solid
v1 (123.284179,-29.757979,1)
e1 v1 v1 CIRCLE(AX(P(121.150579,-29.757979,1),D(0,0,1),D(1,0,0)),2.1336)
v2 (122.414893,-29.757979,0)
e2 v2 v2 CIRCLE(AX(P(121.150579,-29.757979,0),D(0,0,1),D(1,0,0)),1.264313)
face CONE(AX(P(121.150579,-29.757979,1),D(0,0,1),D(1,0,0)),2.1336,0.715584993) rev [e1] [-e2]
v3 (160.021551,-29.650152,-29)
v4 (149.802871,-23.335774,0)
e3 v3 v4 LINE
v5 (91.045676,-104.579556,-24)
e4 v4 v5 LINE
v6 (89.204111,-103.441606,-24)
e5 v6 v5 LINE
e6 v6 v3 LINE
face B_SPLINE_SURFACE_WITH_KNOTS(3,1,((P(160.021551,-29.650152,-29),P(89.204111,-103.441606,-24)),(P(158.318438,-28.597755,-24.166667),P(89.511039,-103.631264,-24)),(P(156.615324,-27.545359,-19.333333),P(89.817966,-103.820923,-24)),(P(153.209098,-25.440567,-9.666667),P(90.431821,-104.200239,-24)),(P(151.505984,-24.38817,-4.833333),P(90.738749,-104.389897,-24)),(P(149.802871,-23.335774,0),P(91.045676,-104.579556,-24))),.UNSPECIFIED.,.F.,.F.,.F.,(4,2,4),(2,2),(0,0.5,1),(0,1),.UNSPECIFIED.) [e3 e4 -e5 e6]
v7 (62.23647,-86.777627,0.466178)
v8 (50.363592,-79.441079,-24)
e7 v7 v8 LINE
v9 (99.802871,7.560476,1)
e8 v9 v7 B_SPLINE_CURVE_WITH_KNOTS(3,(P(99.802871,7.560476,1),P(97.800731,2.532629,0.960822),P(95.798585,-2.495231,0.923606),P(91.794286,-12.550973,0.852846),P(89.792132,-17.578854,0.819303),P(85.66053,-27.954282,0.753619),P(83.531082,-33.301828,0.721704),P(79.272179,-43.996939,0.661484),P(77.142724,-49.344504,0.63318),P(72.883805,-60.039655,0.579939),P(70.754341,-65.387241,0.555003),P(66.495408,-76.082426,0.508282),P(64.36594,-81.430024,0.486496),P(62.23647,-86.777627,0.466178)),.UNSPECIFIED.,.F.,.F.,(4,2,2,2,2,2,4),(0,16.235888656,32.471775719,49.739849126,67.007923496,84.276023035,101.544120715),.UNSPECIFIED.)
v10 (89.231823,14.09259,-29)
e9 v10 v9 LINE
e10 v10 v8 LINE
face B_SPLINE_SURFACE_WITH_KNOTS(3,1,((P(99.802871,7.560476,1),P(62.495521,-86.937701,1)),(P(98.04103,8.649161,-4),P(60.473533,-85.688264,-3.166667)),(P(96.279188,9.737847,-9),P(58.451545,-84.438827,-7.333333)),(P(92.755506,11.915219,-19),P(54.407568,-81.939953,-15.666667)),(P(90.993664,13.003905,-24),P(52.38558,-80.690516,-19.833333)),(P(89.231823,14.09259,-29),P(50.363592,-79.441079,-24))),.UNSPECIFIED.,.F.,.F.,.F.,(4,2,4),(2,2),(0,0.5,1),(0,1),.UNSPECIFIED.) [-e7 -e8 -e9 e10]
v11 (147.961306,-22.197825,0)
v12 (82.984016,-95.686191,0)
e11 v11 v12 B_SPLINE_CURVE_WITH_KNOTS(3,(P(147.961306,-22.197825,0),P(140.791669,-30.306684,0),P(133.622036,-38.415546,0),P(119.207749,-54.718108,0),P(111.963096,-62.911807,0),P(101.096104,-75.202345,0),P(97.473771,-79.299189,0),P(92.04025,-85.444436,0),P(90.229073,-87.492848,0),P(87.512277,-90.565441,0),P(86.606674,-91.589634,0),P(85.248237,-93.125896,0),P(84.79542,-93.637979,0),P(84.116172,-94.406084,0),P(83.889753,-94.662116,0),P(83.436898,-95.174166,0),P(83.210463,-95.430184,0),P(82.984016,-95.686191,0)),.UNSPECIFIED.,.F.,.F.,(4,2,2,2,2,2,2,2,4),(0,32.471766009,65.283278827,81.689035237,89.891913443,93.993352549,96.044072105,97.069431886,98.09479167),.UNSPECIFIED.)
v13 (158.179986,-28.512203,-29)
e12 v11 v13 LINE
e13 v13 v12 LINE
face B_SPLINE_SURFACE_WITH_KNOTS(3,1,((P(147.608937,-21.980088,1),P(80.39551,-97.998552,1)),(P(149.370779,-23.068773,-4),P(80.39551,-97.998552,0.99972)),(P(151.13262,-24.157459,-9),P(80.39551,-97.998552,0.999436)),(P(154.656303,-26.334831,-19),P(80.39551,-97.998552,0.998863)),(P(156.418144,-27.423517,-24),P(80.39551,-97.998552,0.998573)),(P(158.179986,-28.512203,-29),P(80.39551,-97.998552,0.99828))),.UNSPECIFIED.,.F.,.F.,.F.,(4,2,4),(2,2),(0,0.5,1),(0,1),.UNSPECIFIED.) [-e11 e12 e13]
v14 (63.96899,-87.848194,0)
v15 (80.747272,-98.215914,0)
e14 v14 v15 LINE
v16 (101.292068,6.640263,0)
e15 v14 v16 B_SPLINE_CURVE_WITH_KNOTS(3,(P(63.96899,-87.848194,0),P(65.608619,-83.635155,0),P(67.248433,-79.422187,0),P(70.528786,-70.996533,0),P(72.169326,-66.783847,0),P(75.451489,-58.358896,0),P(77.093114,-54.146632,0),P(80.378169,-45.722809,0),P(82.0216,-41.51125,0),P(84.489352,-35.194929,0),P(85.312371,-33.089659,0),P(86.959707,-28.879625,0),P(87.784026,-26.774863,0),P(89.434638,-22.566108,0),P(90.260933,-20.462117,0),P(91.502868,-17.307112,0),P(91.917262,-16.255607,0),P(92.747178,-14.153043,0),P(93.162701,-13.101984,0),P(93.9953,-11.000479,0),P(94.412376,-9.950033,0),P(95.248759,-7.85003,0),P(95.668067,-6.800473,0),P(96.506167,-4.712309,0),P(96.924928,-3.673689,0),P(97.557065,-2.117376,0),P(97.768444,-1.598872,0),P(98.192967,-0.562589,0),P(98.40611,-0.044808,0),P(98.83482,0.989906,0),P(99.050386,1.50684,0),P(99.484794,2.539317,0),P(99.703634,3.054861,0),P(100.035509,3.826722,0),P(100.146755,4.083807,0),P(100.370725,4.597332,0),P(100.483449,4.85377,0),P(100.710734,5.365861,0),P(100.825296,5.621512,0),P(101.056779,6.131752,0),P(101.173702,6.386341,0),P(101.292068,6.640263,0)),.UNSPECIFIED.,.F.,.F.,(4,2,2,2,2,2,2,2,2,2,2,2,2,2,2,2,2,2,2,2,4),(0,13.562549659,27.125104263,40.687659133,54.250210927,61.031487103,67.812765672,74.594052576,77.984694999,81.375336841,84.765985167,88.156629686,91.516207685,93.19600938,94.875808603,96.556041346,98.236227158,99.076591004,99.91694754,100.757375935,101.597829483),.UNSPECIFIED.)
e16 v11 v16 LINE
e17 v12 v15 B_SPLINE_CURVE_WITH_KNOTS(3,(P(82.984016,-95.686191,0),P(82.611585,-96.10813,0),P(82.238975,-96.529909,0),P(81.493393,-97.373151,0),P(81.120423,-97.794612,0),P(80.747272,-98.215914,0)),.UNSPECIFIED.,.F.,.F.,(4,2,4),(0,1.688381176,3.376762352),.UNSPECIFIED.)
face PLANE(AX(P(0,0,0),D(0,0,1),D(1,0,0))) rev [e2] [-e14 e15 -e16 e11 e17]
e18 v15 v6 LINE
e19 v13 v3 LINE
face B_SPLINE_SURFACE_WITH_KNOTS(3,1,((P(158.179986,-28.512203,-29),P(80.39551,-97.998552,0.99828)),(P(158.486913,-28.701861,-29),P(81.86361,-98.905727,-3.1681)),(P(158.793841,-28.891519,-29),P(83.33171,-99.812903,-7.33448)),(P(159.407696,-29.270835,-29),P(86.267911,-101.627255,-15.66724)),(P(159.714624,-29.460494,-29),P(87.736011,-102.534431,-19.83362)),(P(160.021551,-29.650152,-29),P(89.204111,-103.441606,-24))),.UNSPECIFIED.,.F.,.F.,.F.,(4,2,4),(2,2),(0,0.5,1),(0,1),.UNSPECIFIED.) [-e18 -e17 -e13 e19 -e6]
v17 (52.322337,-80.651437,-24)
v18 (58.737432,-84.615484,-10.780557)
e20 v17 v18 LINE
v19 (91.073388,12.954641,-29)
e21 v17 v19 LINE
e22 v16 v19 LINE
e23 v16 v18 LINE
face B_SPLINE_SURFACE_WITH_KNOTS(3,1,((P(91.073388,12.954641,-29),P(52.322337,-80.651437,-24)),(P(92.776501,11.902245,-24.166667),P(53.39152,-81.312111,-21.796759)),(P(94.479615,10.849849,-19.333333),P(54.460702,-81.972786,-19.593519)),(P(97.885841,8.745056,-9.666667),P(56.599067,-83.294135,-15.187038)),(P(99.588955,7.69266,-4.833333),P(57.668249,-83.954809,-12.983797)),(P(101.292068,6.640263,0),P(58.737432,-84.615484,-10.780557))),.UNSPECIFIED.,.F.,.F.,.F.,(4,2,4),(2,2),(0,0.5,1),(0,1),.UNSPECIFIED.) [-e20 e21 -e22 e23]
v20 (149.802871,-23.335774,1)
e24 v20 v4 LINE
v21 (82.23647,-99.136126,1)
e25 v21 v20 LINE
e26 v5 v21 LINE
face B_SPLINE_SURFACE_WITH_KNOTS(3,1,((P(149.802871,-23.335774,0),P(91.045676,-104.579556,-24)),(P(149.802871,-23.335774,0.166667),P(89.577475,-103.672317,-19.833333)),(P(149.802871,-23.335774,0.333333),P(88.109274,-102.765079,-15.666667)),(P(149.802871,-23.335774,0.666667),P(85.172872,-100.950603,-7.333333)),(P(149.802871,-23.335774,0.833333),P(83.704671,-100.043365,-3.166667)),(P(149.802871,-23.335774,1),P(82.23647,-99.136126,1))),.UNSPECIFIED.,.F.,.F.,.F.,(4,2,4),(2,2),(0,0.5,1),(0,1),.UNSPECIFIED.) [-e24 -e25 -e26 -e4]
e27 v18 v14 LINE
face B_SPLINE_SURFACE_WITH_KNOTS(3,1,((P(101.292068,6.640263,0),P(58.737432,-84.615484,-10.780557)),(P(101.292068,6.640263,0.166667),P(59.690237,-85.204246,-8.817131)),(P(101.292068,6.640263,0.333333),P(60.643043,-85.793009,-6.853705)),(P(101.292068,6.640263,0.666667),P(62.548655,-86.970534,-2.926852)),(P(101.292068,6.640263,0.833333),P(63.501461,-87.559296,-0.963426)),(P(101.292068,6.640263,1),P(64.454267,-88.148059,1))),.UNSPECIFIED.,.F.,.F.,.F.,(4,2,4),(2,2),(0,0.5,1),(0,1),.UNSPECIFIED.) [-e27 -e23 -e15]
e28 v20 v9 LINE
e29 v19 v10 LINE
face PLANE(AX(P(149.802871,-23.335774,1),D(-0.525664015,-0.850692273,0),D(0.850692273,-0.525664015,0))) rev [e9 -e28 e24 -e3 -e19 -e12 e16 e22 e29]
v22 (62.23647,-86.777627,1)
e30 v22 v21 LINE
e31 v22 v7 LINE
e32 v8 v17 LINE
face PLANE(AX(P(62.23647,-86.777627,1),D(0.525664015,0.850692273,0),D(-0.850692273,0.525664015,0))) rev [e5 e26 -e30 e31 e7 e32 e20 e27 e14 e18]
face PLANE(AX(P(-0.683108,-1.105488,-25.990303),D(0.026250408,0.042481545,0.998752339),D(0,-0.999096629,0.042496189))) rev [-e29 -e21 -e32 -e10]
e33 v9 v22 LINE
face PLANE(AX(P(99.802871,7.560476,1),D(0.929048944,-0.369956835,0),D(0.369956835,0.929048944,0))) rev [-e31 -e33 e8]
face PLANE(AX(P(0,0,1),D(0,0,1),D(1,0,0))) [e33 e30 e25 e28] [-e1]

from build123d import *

# Parameters (mm, degrees)
BOSS_EXTRUDE1_DEPTH                               = 1
CSK_FOR_1_FLAT_HEAD_SOCKET_CAP_SCREW1_D           = 2.0574
CSK_FOR_1_FLAT_HEAD_SOCKET_CAP_SCREW1_CSINK_D     = 4.2672
CSK_FOR_1_FLAT_HEAD_SOCKET_CAP_SCREW1_CSINK_ANGLE = 82


with BuildPart() as part:
    # Sketch1 → Boss-Extrude1 (new body)
    with BuildSketch(Plane.XY):
        Polygon((99.80287108, 7.560475543), (62.236469572, -86.777626616), (82.236469572, -99.136126436), (149.80287108, -23.335774006), align=None)
    extrude(amount=BOSS_EXTRUDE1_DEPTH)

    # Loft3: read off the stored shape, not the designer's step
    # Loft3: loft between two sections, ruled curve by curve
    loft3_from = [
        Edge.make_bspline([(158.179985747, -28.512202511, -29), (158.486913307, -28.701860721, -29), (158.793840868, -28.891518931, -29), (159.407695988, -29.270835351, -29), (159.714623549, -29.460493561, -29), (160.021551109, -29.650151771, -29)], [0, 0, 0, 0, 0.5, 0.5, 1, 1, 1, 1], 3),
        Edge.make_bspline([(147.608937441, -21.980087582, 1), (149.370778826, -23.068773403, -4), (151.13262021, -24.157459225, -9), (154.656302978, -26.334830868, -19), (156.418144363, -27.423516689, -24), (158.179985747, -28.512202511, -29)], [0, 0, 0, 0, 0.5, 0.5, 1, 1, 1, 1], 3),
        Edge.make_bspline([(160.021551109, -29.650151771, -29), (158.318437771, -28.597755477, -24.166666667), (156.615324433, -27.545359183, -19.333333333), (153.209097757, -25.440566594, -9.666666667), (151.505984418, -24.3881703, -4.833333333), (149.80287108, -23.335774006, 0)], [0, 0, 0, 0, 0.5, 0.5, 1, 1, 1, 1], 3),
        Edge.make_bspline([(149.80287108, -23.335774006, 0), (149.80287108, -23.335774006, 0.166666667), (149.80287108, -23.335774006, 0.333333333), (149.80287108, -23.335774006, 0.666666667), (149.80287108, -23.335774006, 0.833333333), (149.80287108, -23.335774006, 1)], [0, 0, 0, 0, 0.5, 0.5, 1, 1, 1, 1], 3),
        Edge.make_line((149.80287108, -23.335774006, 1), (147.608937441, -21.980087582, 1)),
    ]
    loft3_to = [
        Edge.make_bspline([(80.395510173, -97.998551616, 0.998280313), (81.863610332, -98.905727394, -3.168099739), (83.331710492, -99.812903172, -7.334479791), (86.267910812, -101.627254727, -15.667239896), (87.736010971, -102.534430505, -19.833619948), (89.204111131, -103.441606283, -24)], [0, 0, 0, 0, 0.5, 0.5, 1, 1, 1, 1], 3),
        Edge.make_bspline([(80.395510173, -97.998551616, 1), (80.395510173, -97.998551616, 0.99971966), (80.395510173, -97.998551616, 0.999436182), (80.395510173, -97.998551616, 0.998862953), (80.395510173, -97.998551616, 0.998573202), (80.395510173, -97.998551616, 0.998280313)], [0, 0, 0, 0, 0.5, 0.5, 1, 1, 1, 1], 3),
        Edge.make_bspline([(89.204111131, -103.441606283, -24), (89.511038691, -103.631264493, -24), (89.817966252, -103.820922703, -24), (90.431821372, -104.200239123, -24), (90.738748933, -104.389897333, -24), (91.045676493, -104.579555543, -24)], [0, 0, 0, 0, 0.5, 0.5, 1, 1, 1, 1], 3),
        Edge.make_bspline([(91.045676493, -104.579555543, -24), (89.57747534, -103.672317359, -19.833333333), (88.109274186, -102.765079174, -15.666666667), (85.172871879, -100.950602805, -7.333333333), (83.704670725, -100.04336462, -3.166666667), (82.236469572, -99.136126436, 1)], [0, 0, 0, 0, 0.5, 0.5, 1, 1, 1, 1], 3),
        Edge.make_line((82.236469572, -99.136126436, 1), (80.395510173, -97.998551616, 1)),
    ]
    loft3 = Solid(Shell([*[Face.make_surface_from_curves(loft3_from[k], loft3_to[k]) for k in range(5)], Face(Wire(loft3_from)), Face(Wire(loft3_to))]))
    add(loft3)

    # Sketch12 → Loft4 section 0
    with BuildSketch(Plane(origin=(30.958675209, 50.101024656, 0), x_dir=(0.8506922729426725, -0.5256640150853298, 0), z_dir=(0.5256640150853298, 0.8506922729426725, 0))):
        with BuildLine():
            Line((82.677832154, -1), (82.677832154, 0))
            Line((82.677832154, 0), (70.665638845, 29))
            Line((70.665638845, 29), (68.500854444, 29))
            Line((68.500854444, 29), (80.927261316, -1))
            Line((80.927261316, -1), (82.677832154, -1))
        make_face()
    # Sketch13 → Loft4 section 1
    with BuildSketch(Plane(origin=(-21.6077263, -34.968202638, 0), x_dir=(-0.8506922729426724, 0.52566401508533, 0), z_dir=(-0.52566401508533, -0.8506922729426724, 0))):
        with BuildLine():
            Line((-98.864477851, -1), (-84.60323453, 24))
            Line((-84.60323453, 24), (-86.905766091, 24))
            Line((-86.905766091, 24), (-94.44679393, 10.780556805))
            Line((-94.44679393, 10.780556805), (-101.167009412, -1))
            Line((-101.167009412, -1), (-98.864477851, -1))
        make_face()
    loft()

    # CSK for #1 Flat Head Socket Cap Screw1 (through all)
    with Locations(Plane.XY.offset(1)):
        with Locations((121.150579346, -29.757979407)):
            CounterSinkHole(CSK_FOR_1_FLAT_HEAD_SOCKET_CAP_SCREW1_D / 2, CSK_FOR_1_FLAT_HEAD_SOCKET_CAP_SCREW1_CSINK_D / 2, counter_sink_angle=CSK_FOR_1_FLAT_HEAD_SOCKET_CAP_SCREW1_CSINK_ANGLE)


solid = part.part
